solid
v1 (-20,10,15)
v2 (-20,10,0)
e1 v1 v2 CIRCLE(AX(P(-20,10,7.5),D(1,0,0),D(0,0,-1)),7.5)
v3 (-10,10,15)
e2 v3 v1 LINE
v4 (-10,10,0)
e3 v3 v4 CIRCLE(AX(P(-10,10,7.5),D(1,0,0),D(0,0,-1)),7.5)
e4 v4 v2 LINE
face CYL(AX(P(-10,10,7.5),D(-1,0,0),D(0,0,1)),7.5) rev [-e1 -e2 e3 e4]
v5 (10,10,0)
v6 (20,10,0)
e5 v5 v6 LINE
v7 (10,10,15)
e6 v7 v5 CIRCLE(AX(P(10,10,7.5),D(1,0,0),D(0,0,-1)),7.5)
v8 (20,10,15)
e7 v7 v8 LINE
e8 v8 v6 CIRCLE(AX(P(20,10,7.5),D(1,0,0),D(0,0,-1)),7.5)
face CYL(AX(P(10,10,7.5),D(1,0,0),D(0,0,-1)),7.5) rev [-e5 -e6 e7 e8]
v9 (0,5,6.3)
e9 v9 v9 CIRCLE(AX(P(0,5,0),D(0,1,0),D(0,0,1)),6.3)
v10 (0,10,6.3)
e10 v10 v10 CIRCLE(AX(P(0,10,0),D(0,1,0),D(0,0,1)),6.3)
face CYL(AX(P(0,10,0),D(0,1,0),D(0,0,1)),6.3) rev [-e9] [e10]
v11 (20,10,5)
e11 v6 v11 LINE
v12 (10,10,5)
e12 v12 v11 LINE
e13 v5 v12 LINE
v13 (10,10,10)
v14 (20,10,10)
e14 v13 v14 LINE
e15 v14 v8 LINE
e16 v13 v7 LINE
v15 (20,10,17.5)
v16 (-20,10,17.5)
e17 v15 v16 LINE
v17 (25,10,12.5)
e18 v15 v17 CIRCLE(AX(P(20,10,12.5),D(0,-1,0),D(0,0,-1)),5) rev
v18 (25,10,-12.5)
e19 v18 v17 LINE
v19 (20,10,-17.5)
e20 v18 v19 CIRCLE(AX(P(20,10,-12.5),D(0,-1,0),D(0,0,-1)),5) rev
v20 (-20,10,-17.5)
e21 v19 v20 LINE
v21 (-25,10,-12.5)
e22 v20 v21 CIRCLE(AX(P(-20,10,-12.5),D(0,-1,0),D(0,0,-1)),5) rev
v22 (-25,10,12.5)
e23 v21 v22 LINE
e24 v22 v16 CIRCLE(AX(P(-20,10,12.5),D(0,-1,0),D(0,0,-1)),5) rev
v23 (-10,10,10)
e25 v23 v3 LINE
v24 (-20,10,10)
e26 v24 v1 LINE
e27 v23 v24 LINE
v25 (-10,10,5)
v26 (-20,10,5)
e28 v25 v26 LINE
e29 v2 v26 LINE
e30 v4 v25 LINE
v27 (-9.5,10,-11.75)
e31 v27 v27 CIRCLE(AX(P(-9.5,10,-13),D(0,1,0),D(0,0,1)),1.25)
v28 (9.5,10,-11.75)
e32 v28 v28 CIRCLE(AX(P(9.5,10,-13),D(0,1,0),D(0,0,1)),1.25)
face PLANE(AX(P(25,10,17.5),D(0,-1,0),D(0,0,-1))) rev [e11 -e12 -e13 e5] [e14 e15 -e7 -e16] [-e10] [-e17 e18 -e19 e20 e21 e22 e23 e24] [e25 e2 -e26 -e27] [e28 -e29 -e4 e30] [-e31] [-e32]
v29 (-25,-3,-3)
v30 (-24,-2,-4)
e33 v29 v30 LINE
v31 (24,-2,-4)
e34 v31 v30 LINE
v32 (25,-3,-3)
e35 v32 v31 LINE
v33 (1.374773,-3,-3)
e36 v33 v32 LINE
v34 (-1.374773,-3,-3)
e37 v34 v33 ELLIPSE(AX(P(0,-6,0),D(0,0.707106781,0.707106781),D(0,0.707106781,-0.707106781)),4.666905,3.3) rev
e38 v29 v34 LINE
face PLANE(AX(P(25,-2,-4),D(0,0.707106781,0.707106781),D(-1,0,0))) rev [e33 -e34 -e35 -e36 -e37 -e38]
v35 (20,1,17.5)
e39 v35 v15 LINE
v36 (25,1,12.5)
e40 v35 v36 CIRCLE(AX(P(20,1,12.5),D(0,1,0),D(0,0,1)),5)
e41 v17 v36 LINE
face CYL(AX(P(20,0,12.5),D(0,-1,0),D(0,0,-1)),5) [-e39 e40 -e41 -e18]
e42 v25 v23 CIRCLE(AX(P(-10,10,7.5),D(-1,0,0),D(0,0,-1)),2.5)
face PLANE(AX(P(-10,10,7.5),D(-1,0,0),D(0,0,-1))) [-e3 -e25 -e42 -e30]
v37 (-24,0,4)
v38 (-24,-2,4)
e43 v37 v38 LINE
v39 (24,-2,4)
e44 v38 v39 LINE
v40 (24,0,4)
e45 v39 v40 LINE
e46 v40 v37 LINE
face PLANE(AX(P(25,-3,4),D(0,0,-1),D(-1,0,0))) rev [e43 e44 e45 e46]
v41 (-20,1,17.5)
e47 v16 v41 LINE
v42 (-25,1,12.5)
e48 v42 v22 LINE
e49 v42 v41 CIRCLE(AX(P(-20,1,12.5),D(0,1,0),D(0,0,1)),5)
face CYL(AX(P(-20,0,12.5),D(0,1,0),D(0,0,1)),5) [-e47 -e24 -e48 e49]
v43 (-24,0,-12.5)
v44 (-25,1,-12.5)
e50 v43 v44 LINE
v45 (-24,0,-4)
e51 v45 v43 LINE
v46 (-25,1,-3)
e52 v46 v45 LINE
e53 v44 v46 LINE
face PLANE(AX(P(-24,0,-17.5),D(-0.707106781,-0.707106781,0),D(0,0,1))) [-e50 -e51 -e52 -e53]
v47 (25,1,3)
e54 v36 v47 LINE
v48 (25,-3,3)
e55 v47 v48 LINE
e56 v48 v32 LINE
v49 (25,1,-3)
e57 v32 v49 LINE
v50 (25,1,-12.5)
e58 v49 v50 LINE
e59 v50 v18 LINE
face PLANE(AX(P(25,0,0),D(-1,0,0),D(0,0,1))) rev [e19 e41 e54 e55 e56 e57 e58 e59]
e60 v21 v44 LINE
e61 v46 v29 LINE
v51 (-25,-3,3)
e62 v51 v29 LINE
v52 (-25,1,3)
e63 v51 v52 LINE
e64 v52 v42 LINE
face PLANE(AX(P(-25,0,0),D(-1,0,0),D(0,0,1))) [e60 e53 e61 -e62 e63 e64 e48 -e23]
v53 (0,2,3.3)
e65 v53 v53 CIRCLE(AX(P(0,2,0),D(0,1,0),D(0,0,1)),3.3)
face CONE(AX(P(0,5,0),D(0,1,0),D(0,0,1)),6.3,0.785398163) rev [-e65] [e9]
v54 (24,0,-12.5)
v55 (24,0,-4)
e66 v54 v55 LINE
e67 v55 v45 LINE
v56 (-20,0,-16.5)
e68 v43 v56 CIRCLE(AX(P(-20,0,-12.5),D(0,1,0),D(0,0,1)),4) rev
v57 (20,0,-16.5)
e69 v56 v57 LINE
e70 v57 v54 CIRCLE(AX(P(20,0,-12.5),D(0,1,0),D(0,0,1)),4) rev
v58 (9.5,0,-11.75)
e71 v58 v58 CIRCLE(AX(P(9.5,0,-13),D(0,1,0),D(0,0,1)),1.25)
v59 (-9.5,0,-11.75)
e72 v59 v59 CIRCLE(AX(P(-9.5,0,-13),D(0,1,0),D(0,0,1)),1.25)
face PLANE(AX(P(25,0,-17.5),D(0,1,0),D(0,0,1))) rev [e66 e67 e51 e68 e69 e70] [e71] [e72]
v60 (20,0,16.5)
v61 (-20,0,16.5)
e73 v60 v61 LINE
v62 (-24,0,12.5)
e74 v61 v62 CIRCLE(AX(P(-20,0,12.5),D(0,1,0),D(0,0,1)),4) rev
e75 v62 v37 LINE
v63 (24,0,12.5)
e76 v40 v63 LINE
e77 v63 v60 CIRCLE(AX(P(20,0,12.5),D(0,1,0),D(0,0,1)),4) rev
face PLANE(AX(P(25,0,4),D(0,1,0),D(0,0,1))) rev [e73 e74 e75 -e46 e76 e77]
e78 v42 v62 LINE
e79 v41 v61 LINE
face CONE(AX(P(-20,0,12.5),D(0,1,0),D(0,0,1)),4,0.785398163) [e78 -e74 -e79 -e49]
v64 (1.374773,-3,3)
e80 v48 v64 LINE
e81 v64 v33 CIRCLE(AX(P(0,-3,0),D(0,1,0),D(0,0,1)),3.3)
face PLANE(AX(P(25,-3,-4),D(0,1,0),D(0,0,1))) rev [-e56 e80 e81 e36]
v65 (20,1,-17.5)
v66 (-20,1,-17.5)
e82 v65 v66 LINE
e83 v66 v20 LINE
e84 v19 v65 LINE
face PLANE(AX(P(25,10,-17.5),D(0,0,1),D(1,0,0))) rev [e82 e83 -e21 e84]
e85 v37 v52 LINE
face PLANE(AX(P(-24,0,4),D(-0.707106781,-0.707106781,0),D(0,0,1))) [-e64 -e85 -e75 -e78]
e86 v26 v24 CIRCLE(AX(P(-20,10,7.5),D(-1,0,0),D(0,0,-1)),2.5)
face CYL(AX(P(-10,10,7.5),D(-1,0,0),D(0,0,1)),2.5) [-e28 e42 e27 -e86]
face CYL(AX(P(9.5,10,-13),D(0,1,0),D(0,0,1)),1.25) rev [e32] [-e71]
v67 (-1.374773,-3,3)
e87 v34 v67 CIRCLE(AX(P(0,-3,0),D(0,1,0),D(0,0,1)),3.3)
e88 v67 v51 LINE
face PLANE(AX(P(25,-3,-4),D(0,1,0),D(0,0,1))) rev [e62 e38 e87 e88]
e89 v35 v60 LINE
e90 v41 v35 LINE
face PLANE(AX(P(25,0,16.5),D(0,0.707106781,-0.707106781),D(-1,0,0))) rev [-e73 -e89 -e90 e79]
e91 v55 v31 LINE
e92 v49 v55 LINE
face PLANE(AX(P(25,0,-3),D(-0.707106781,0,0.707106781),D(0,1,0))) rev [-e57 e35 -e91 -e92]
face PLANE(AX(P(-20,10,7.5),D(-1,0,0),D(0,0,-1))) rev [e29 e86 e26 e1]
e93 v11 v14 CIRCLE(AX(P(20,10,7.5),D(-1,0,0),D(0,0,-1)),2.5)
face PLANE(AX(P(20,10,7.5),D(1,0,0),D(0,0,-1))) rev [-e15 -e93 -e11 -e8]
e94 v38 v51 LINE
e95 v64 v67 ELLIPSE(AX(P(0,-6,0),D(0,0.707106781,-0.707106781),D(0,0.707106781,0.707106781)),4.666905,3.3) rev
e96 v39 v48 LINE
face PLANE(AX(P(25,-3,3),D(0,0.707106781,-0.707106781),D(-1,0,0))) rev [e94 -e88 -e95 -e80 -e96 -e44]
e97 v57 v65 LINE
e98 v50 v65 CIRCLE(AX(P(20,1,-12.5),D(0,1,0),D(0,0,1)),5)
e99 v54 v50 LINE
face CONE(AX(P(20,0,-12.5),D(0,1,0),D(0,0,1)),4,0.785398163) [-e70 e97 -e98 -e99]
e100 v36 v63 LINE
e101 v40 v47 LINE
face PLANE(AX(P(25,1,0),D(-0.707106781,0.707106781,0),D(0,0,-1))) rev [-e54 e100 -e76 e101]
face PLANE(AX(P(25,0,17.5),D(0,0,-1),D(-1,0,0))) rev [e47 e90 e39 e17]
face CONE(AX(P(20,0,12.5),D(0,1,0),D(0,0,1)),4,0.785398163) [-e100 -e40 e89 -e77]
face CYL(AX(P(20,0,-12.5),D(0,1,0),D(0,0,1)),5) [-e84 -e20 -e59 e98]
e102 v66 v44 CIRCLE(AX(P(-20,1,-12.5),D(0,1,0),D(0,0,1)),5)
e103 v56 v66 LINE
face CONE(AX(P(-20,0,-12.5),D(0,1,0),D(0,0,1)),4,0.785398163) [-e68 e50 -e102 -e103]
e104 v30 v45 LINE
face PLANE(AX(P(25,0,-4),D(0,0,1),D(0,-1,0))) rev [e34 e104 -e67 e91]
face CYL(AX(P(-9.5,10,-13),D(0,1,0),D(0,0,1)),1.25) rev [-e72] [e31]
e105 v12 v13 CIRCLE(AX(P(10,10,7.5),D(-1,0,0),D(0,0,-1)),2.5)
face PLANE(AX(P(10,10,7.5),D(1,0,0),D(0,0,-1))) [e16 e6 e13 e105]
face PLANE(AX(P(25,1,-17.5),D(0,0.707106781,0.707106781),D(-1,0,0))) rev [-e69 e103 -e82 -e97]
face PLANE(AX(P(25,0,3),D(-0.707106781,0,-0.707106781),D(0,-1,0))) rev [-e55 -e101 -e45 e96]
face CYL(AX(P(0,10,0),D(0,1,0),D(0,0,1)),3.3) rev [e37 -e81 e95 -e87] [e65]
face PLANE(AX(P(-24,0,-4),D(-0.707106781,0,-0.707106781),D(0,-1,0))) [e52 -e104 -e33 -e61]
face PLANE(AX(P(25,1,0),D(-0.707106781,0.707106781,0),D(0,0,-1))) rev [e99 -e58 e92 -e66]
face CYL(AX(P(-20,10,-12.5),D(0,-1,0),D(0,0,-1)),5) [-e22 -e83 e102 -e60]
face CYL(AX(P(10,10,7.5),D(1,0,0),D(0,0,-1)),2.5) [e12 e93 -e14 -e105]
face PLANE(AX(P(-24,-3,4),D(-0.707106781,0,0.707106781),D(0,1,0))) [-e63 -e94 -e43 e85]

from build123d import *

# Parameters (mm, degrees)
BOSS_EXTRUDE1_DEPTH   = 25
CUT_EXTRUDE1_DEPTH    = 5
FILLET1_R             = 5
CHAMFER1_SIZE         = 1
M3X0_5_TAPPED_HOLE1_D = 2.5


with BuildPart() as part:
    # Sketch1 → Boss-Extrude1 (new, symmetric)
    with BuildSketch(Plane(origin=(0, 0, 0), x_dir=(0, 0, -1), z_dir=(1, 0, 0))):
        Polygon((-17.5, 10), (17.5, 10), (17.5, 0), (4, 0), (4, -3), (-4, -3), (-4, 0), (-17.5, 0), align=None)
    extrude(amount=BOSS_EXTRUDE1_DEPTH, both=True)

    # Sketch3 → CSK for M6 Flat Head Machine Screw1 (revolve, cut)
    with BuildSketch(Plane(origin=(0, 10, 0), x_dir=(0, 0, 1), z_dir=(1, 0, 0))):
        Polygon((0, 0), (0, 13), (3.3, 13), (3.3, 8), (6.3, 5), (6.3, 0), align=None)
    revolve(axis=Axis((0, 16.35, 0), (0, -1, 0)), mode=Mode.SUBTRACT)

    # Sketch4 → Cut-Extrude1 (cut, symmetric)
    with BuildSketch(Plane(origin=(15, 0, 0), x_dir=(0, 0, -1), z_dir=(1, 0, 0))):
        with BuildLine():
            Line((-15, 10), (-10, 10))
            ThreePointArc((-10, 10), (-7.5, 7.5), (-5, 10))
            Line((-5, 10), (0, 10))
            ThreePointArc((0, 10), (-7.5, 2.5), (-15, 10))
        make_face()
    cut_extrude1 = extrude(amount=CUT_EXTRUDE1_DEPTH, both=True, mode=Mode.SUBTRACT)

    # Mirror1: Cut-Extrude1 across plane
    add(cut_extrude1.mirror(Plane(origin=(0, 0, 0), x_dir=(0, 0, 1), z_dir=(1, 0, 0))), mode=Mode.SUBTRACT)

    # Fillet1
    fillet1_edges = [part.edges().sort_by_distance(p)[0] for p in [
        (-25, 5, 17.5),
        (25, 5, -17.5),
        (25, 5, 17.5),
        (-25, 5, -17.5),
    ]]
    fillet(fillet1_edges, radius=FILLET1_R)

    # Chamfer1
    # the kernel refuses this chamfer: 1 mm, written as the material it takes off along each edge
    with BuildSketch(Plane(origin=(-25, -5.571682988, 4), x_dir=(-0.027495876610585623, 0, -0.9996219169112968), z_dir=(0, 1, 0)), Plane(origin=(-25, 0, -4), x_dir=(-0.027495876610585623, 0, 0.9996219169112968), z_dir=(0, -1, 0))) as chamfer1_piece_1:
        Polygon((CHAMFER1_SIZE * 0.999621916911, -CHAMFER1_SIZE * 0.0274958766106), (-CHAMFER1_SIZE * 0.0274958766106, -CHAMFER1_SIZE * 0.999621916911), (0, 0), align=None)
    extrude(amount=5.571682988, mode=Mode.SUBTRACT)
    with BuildSketch(Plane(origin=(25, -5.571682988, 4), x_dir=(0.027495876610585623, 0, -0.9996219169112968), z_dir=(0, 1, 0)), Plane(origin=(25, 0, -4), x_dir=(0.027495876610585623, 0, 0.9996219169112968), z_dir=(0, -1, 0))) as chamfer1_piece_2:
        Polygon((CHAMFER1_SIZE * 0.999621916911, CHAMFER1_SIZE * 0.0274958766106), (-CHAMFER1_SIZE * 0.0274958766106, CHAMFER1_SIZE * 0.999621916911), (0, 0), align=None)
    extrude(amount=5.571682988, mode=Mode.SUBTRACT)
    with BuildSketch(Plane(origin=(27.571682988, -3, -4), x_dir=(0, 0.9996219169112968, -0.027495876610586494), z_dir=(-1, 0, 0))) as chamfer1_piece_3:
        Polygon((CHAMFER1_SIZE * 0.999621916911, -CHAMFER1_SIZE * 0.0274958766106), (-CHAMFER1_SIZE * 0.0274958766106, -CHAMFER1_SIZE * 0.999621916911), (0, 0), align=None)
    extrude(amount=55.143365976, mode=Mode.SUBTRACT)
    with BuildSketch(Plane(origin=(27.571682988, -3, 4), x_dir=(0, 0.9996219169112968, 0.027495876610586494), z_dir=(-1, 0, 0))) as chamfer1_piece_4:
        Polygon((CHAMFER1_SIZE * 0.999621916911, CHAMFER1_SIZE * 0.0274958766106), (-CHAMFER1_SIZE * 0.0274958766106, CHAMFER1_SIZE * 0.999621916911), (0, 0), align=None)
    extrude(amount=55.143365976, mode=Mode.SUBTRACT)
    with BuildSketch(Plane(origin=(25, 0, -12.5), x_dir=(0.027495876610585623, 0.9996219169112968, 0), z_dir=(0, 0, 1)), Plane(origin=(25, 0, 4), x_dir=(0.02749587661058563, 0.9996219169112968, 0), z_dir=(0, 0, 1))) as chamfer1_piece_5:
        Polygon((CHAMFER1_SIZE * 0.999621916911, CHAMFER1_SIZE * 0.0274958766106), (-CHAMFER1_SIZE * 0.0274958766106, CHAMFER1_SIZE * 0.999621916911), (0, 0), align=None)
    extrude(amount=8.5, mode=Mode.SUBTRACT)
    with BuildSketch(Plane(origin=(-25, 0, 4), x_dir=(-0.02749587661058563, 0.9996219169112968, 0), z_dir=(0, 0, 1)), Plane(origin=(-25, 0, -12.5), x_dir=(-0.027495876610585623, 0.9996219169112968, 0), z_dir=(0, 0, 1))) as chamfer1_piece_6:
        Polygon((CHAMFER1_SIZE * 0.999621916911, -CHAMFER1_SIZE * 0.0274958766106), (-CHAMFER1_SIZE * 0.0274958766106, -CHAMFER1_SIZE * 0.999621916911), (0, 0), align=None)
    extrude(amount=8.5, mode=Mode.SUBTRACT)
    with BuildSketch(Plane(origin=(-20, 0, 17.5), x_dir=(0, 0.9996219169112968, 0.02749587661058563), z_dir=(1, 0, 0)), Plane(origin=(20, 0, -17.5), x_dir=(0, 0.9996219169112968, -0.027495876610585623), z_dir=(-1, 0, 0))) as chamfer1_piece_7:
        Polygon((CHAMFER1_SIZE * 0.999621916911, -CHAMFER1_SIZE * 0.0274958766106), (-CHAMFER1_SIZE * 0.0274958766106, -CHAMFER1_SIZE * 0.999621916911), (0, 0), align=None)
    extrude(amount=40, mode=Mode.SUBTRACT)
    with BuildSketch(Plane(origin=(-20, 0, 12.5), x_dir=(0, 0, 1), z_dir=(1, 0, 0))) as chamfer1_piece_8:
        Polygon((5, -CHAMFER1_SIZE), (5 - CHAMFER1_SIZE, 0), (5, 0), align=None)
    revolve(axis=Axis((-20, 0, 12.5), (0, -1, 0)), revolution_arc=90, mode=Mode.SUBTRACT)
    with BuildSketch(Plane(origin=(20, 0, 12.5), x_dir=(0, 0, 1), z_dir=(-1, 0, 0))) as chamfer1_piece_9:
        Polygon((5, CHAMFER1_SIZE), (5 - CHAMFER1_SIZE, 0), (5, 0), align=None)
    revolve(axis=Axis((20, 0, 12.5), (0, 1, 0)), revolution_arc=90, mode=Mode.SUBTRACT)
    with BuildSketch(Plane(origin=(-20, 0, -12.5), x_dir=(-1, 0, 0), z_dir=(0, 0, 1))) as chamfer1_piece_10:
        Polygon((5, -CHAMFER1_SIZE), (5 - CHAMFER1_SIZE, 0), (5, 0), align=None)
    revolve(axis=Axis((-20, 0, -12.5), (0, -1, 0)), revolution_arc=90, mode=Mode.SUBTRACT)
    with BuildSketch(Plane(origin=(20, 0, -12.5), x_dir=(1, 0, 0), z_dir=(0, 0, 1))) as chamfer1_piece_11:
        Polygon((5, CHAMFER1_SIZE), (5 - CHAMFER1_SIZE, 0), (5, 0), align=None)
    revolve(axis=Axis((20, 0, -12.5), (0, 1, 0)), revolution_arc=90, mode=Mode.SUBTRACT)
    with BuildSketch(Plane(origin=(-25, 0, 1.428317012), x_dir=(-0.02749587661058563, 0.9996219169112968, 0), z_dir=(0, 0, 1))) as chamfer1_piece_12a_section:
        Polygon((CHAMFER1_SIZE * 0.999621916911, -CHAMFER1_SIZE * 0.0274958766106), (-CHAMFER1_SIZE * 0.0274958766106, -CHAMFER1_SIZE * 0.999621916911), (0, 0), align=None)
    chamfer1_piece_12a = extrude(amount=11.071682988, mode=Mode.PRIVATE)
    chamfer1_piece_12a = split(chamfer1_piece_12a, bisect_by=Plane(origin=(-24.670206373, 0.329793627, 4), z_dir=(0, 0, -1)), keep=Keep.TOP, mode=Mode.PRIVATE)
    with BuildSketch(Plane(origin=(-25, -5.571682988, 4), x_dir=(-0.027495876610585623, 0, -0.9996219169112968), z_dir=(0, 1, 0))) as chamfer1_piece_12b_section:
        Polygon((CHAMFER1_SIZE * 0.999621916911, -CHAMFER1_SIZE * 0.0274958766106), (-CHAMFER1_SIZE * 0.0274958766106, -CHAMFER1_SIZE * 0.999621916911), (0, 0), align=None)
    chamfer1_piece_12b = extrude(amount=8.143365976, mode=Mode.PRIVATE)
    chamfer1_piece_12b = split(chamfer1_piece_12b, bisect_by=Plane(origin=(-24.670206373, 0, 3.670206373), z_dir=(0, 1, 0)), keep=Keep.TOP, mode=Mode.PRIVATE)
    chamfer1_piece_12 = chamfer1_piece_12a & chamfer1_piece_12b
    add(chamfer1_piece_12, mode=Mode.SUBTRACT)
    with BuildSketch(Plane(origin=(25, 0, 1.428317012), x_dir=(0.02749587661058563, 0.9996219169112968, 0), z_dir=(0, 0, 1))) as chamfer1_piece_13a_section:
        Polygon((CHAMFER1_SIZE * 0.999621916911, CHAMFER1_SIZE * 0.0274958766106), (-CHAMFER1_SIZE * 0.0274958766106, CHAMFER1_SIZE * 0.999621916911), (0, 0), align=None)
    chamfer1_piece_13a = extrude(amount=11.071682988, mode=Mode.PRIVATE)
    chamfer1_piece_13a = split(chamfer1_piece_13a, bisect_by=Plane(origin=(24.670206373, 0.329793627, 4), z_dir=(0, 0, -1)), keep=Keep.TOP, mode=Mode.PRIVATE)
    with BuildSketch(Plane(origin=(25, -5.571682988, 4), x_dir=(0.027495876610585623, 0, -0.9996219169112968), z_dir=(0, 1, 0))) as chamfer1_piece_13b_section:
        Polygon((CHAMFER1_SIZE * 0.999621916911, CHAMFER1_SIZE * 0.0274958766106), (-CHAMFER1_SIZE * 0.0274958766106, CHAMFER1_SIZE * 0.999621916911), (0, 0), align=None)
    chamfer1_piece_13b = extrude(amount=8.143365976, mode=Mode.PRIVATE)
    chamfer1_piece_13b = split(chamfer1_piece_13b, bisect_by=Plane(origin=(24.670206373, 0, 3.670206373), z_dir=(0, 1, 0)), keep=Keep.TOP, mode=Mode.PRIVATE)
    chamfer1_piece_13 = chamfer1_piece_13a & chamfer1_piece_13b
    add(chamfer1_piece_13, mode=Mode.SUBTRACT)
    with BuildSketch(Plane(origin=(25, 0, -12.5), x_dir=(0.027495876610585623, 0.9996219169112968, 0), z_dir=(0, 0, 1))) as chamfer1_piece_14a_section:
        Polygon((CHAMFER1_SIZE * 0.999621916911, CHAMFER1_SIZE * 0.0274958766106), (-CHAMFER1_SIZE * 0.0274958766106, CHAMFER1_SIZE * 0.999621916911), (0, 0), align=None)
    chamfer1_piece_14a = extrude(amount=11.071682988, mode=Mode.PRIVATE)
    chamfer1_piece_14a = split(chamfer1_piece_14a, bisect_by=Plane(origin=(24.670206373, 0.329793627, -4), z_dir=(0, 0, 1)), keep=Keep.TOP, mode=Mode.PRIVATE)
    with BuildSketch(Plane(origin=(25, 2.571682988, -4), x_dir=(0.027495876610585623, 0, 0.9996219169112968), z_dir=(0, -1, 0))) as chamfer1_piece_14b_section:
        Polygon((CHAMFER1_SIZE * 0.999621916911, CHAMFER1_SIZE * 0.0274958766106), (-CHAMFER1_SIZE * 0.0274958766106, CHAMFER1_SIZE * 0.999621916911), (0, 0), align=None)
    chamfer1_piece_14b = extrude(amount=8.143365976, mode=Mode.PRIVATE)
    chamfer1_piece_14b = split(chamfer1_piece_14b, bisect_by=Plane(origin=(24.670206373, 0, -3.670206373), z_dir=(0, 1, 0)), keep=Keep.TOP, mode=Mode.PRIVATE)
    chamfer1_piece_14 = chamfer1_piece_14a & chamfer1_piece_14b
    add(chamfer1_piece_14, mode=Mode.SUBTRACT)
    with BuildSketch(Plane(origin=(-25, 0, -12.5), x_dir=(-0.027495876610585623, 0.9996219169112968, 0), z_dir=(0, 0, 1))) as chamfer1_piece_15a_section:
        Polygon((CHAMFER1_SIZE * 0.999621916911, -CHAMFER1_SIZE * 0.0274958766106), (-CHAMFER1_SIZE * 0.0274958766106, -CHAMFER1_SIZE * 0.999621916911), (0, 0), align=None)
    chamfer1_piece_15a = extrude(amount=11.071682988, mode=Mode.PRIVATE)
    chamfer1_piece_15a = split(chamfer1_piece_15a, bisect_by=Plane(origin=(-24.670206373, 0.329793627, -4), z_dir=(0, 0, 1)), keep=Keep.TOP, mode=Mode.PRIVATE)
    with BuildSketch(Plane(origin=(-25, 2.571682988, -4), x_dir=(-0.027495876610585623, 0, 0.9996219169112968), z_dir=(0, -1, 0))) as chamfer1_piece_15b_section:
        Polygon((CHAMFER1_SIZE * 0.999621916911, -CHAMFER1_SIZE * 0.0274958766106), (-CHAMFER1_SIZE * 0.0274958766106, -CHAMFER1_SIZE * 0.999621916911), (0, 0), align=None)
    chamfer1_piece_15b = extrude(amount=8.143365976, mode=Mode.PRIVATE)
    chamfer1_piece_15b = split(chamfer1_piece_15b, bisect_by=Plane(origin=(-24.670206373, 0, -3.670206373), z_dir=(0, 1, 0)), keep=Keep.TOP, mode=Mode.PRIVATE)
    chamfer1_piece_15 = chamfer1_piece_15a & chamfer1_piece_15b
    add(chamfer1_piece_15, mode=Mode.SUBTRACT)

    # M3x0.5 Tapped Hole1 (through all)
    with Locations(Plane(origin=(0, 10, 0), x_dir=(1, 0, 0), z_dir=(0, 1, 0))):
        with Locations((-9.5, 13), (9.5, 13)):
            Hole(M3X0_5_TAPPED_HOLE1_D / 2)


solid = part.part
